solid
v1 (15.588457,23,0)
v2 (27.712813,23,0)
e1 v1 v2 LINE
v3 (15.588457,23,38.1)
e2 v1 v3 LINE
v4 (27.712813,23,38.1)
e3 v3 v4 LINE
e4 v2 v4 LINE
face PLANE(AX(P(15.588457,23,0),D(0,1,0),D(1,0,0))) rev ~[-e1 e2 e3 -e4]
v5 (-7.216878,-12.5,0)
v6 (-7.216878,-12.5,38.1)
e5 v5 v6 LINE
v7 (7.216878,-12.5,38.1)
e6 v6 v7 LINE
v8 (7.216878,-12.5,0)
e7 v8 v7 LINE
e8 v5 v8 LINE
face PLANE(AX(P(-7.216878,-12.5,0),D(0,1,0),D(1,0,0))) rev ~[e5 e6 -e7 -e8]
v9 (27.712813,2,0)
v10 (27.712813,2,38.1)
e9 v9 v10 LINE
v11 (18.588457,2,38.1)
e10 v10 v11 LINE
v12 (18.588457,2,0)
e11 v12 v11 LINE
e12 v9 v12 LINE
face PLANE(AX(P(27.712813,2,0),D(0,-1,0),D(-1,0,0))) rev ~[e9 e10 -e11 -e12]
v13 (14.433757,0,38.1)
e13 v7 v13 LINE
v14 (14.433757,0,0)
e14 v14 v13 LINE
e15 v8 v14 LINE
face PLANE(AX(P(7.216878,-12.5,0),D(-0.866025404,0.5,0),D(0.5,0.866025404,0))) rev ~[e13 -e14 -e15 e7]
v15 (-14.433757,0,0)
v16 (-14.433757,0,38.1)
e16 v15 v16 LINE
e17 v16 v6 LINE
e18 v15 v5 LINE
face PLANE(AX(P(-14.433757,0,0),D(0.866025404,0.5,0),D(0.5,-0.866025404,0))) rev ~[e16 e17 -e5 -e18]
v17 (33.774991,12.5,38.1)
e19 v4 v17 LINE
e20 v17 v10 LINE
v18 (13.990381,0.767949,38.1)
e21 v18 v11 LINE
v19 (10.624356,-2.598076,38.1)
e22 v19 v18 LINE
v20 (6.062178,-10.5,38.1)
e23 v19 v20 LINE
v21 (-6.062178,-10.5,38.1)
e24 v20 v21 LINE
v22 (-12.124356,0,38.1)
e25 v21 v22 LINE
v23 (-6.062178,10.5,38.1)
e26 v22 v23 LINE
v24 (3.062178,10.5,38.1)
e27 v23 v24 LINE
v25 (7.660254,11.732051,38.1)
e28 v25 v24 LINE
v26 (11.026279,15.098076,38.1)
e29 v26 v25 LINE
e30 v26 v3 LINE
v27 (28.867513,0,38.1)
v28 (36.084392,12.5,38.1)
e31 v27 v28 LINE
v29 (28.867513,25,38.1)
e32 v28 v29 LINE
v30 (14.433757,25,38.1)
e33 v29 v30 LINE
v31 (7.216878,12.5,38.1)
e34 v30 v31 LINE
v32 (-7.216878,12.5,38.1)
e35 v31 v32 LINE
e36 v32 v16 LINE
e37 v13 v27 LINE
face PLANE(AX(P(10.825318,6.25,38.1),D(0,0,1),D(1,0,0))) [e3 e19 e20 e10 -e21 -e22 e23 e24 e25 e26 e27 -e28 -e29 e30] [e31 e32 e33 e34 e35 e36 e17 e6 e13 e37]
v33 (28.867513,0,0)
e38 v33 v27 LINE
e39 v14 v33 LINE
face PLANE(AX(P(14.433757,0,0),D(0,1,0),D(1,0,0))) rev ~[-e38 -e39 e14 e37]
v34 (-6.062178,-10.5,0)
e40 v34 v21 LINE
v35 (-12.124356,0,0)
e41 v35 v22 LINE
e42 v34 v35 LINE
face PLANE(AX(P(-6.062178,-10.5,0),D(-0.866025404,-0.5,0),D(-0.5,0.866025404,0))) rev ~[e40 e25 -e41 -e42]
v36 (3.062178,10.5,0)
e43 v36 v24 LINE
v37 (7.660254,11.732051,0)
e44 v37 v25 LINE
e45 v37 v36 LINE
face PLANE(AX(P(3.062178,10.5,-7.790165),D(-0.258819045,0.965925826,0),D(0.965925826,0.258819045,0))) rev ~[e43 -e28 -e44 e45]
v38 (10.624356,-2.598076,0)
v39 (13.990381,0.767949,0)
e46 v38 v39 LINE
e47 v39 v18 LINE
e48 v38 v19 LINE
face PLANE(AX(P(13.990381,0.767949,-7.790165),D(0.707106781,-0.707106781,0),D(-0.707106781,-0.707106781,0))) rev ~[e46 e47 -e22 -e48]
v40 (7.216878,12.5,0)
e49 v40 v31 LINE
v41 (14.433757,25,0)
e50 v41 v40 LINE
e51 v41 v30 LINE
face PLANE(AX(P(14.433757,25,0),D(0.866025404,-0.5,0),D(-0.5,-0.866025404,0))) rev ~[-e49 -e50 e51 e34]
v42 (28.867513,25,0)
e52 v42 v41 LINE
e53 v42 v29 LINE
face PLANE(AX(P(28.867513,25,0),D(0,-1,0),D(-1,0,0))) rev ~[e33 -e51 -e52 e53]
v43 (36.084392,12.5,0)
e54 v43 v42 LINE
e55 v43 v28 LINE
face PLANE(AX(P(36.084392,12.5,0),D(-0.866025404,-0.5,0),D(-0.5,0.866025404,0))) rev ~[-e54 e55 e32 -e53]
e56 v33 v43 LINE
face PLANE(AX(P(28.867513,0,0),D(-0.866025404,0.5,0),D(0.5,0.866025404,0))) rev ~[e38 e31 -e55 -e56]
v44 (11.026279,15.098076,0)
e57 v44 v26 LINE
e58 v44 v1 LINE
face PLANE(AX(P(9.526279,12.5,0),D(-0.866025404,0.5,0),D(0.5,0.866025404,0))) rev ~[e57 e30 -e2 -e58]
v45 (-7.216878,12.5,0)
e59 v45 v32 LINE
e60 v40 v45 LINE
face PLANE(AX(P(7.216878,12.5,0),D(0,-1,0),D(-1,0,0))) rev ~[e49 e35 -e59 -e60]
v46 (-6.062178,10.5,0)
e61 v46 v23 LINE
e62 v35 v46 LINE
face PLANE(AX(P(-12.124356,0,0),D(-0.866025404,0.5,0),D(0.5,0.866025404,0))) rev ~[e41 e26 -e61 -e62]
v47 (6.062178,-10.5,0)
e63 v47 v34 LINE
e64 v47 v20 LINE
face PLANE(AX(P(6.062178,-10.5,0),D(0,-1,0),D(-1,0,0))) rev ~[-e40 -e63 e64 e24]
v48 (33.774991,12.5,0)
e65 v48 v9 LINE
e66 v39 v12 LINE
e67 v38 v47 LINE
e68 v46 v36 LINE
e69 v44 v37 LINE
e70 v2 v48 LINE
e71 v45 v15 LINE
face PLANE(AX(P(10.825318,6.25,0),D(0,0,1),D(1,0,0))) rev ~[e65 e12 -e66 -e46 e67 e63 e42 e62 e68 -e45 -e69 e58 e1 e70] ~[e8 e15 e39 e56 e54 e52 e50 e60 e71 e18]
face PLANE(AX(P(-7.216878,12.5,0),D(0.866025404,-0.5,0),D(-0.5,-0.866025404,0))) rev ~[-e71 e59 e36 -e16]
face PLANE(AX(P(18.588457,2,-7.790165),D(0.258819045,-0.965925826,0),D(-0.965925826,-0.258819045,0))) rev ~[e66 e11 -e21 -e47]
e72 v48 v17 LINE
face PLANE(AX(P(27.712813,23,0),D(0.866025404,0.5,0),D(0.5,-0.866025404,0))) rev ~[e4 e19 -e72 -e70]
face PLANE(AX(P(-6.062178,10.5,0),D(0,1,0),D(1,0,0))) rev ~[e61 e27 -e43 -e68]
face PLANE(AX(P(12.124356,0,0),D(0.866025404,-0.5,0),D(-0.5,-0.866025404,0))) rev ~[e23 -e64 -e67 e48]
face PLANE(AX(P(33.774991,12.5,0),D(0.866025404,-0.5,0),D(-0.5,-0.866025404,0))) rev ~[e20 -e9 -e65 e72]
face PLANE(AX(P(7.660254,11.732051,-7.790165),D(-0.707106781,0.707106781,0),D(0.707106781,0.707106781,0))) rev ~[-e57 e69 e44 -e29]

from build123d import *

# Parameters (mm, degrees)
F1_DEPTH    = 38.1
F2_T1_DEPTH = 53.6803294212


# Not quite as in the source:
# - a fillet or chamfer that OpenCascade refuses, or shapes differently, is made with other operations: its cross-section is extruded or revolved along the edge and cut away or added


with BuildPart() as f1:
    # F0 (on Top) → F1 (new body)
    with BuildSketch(Plane.XY):
        Polygon((-7.2168783649, -12.5), (7.2168783649, -12.5), (14.4337567297, 0), (28.8675134595, 0), (36.0843918244, 12.5), (28.8675134595, 25), (14.4337567297, 25), (7.2168783649, 12.5), (-7.2168783649, 12.5), (-14.4337567297, 0), align=None)
        Polygon((12.124355653, 0), (6.0621778265, -10.5), (-6.0621778265, -10.5), (-12.124355653, 0), (-6.0621778265, 10.5), (6.0621778265, 10.5), (9.5262794416, 12.5), (15.5884572681, 23), (27.7128129211, 23), (33.7749907476, 12.5), (27.7128129211, 2), (15.5884572681, 2), align=None, mode=Mode.SUBTRACT)
    extrude(amount=F1_DEPTH)

    # F2: chamfer of 3 on 4 edges, made by hand

    # F2_s2 → F2_t1 (cut)
    with BuildSketch(Plane.XY.offset(-7.7901647106)):
        Polygon((3.0621778265, 10.5), (8.6602540378, 12), (6.0621778265, 10.5), align=None)
        Polygon((6.9282032303, 11), (11.0262794416, 15.0980762114), (9.5262794416, 12.5), align=None)
        Polygon((14.7224318643, 1.5), (10.624355653, -2.5980762114), (12.124355653, 0), align=None)
        Polygon((18.5884572681, 2), (12.9903810568, 0.5), (15.5884572681, 2), align=None)
    extrude(amount=F2_T1_DEPTH, mode=Mode.SUBTRACT)


solid = f1.part
